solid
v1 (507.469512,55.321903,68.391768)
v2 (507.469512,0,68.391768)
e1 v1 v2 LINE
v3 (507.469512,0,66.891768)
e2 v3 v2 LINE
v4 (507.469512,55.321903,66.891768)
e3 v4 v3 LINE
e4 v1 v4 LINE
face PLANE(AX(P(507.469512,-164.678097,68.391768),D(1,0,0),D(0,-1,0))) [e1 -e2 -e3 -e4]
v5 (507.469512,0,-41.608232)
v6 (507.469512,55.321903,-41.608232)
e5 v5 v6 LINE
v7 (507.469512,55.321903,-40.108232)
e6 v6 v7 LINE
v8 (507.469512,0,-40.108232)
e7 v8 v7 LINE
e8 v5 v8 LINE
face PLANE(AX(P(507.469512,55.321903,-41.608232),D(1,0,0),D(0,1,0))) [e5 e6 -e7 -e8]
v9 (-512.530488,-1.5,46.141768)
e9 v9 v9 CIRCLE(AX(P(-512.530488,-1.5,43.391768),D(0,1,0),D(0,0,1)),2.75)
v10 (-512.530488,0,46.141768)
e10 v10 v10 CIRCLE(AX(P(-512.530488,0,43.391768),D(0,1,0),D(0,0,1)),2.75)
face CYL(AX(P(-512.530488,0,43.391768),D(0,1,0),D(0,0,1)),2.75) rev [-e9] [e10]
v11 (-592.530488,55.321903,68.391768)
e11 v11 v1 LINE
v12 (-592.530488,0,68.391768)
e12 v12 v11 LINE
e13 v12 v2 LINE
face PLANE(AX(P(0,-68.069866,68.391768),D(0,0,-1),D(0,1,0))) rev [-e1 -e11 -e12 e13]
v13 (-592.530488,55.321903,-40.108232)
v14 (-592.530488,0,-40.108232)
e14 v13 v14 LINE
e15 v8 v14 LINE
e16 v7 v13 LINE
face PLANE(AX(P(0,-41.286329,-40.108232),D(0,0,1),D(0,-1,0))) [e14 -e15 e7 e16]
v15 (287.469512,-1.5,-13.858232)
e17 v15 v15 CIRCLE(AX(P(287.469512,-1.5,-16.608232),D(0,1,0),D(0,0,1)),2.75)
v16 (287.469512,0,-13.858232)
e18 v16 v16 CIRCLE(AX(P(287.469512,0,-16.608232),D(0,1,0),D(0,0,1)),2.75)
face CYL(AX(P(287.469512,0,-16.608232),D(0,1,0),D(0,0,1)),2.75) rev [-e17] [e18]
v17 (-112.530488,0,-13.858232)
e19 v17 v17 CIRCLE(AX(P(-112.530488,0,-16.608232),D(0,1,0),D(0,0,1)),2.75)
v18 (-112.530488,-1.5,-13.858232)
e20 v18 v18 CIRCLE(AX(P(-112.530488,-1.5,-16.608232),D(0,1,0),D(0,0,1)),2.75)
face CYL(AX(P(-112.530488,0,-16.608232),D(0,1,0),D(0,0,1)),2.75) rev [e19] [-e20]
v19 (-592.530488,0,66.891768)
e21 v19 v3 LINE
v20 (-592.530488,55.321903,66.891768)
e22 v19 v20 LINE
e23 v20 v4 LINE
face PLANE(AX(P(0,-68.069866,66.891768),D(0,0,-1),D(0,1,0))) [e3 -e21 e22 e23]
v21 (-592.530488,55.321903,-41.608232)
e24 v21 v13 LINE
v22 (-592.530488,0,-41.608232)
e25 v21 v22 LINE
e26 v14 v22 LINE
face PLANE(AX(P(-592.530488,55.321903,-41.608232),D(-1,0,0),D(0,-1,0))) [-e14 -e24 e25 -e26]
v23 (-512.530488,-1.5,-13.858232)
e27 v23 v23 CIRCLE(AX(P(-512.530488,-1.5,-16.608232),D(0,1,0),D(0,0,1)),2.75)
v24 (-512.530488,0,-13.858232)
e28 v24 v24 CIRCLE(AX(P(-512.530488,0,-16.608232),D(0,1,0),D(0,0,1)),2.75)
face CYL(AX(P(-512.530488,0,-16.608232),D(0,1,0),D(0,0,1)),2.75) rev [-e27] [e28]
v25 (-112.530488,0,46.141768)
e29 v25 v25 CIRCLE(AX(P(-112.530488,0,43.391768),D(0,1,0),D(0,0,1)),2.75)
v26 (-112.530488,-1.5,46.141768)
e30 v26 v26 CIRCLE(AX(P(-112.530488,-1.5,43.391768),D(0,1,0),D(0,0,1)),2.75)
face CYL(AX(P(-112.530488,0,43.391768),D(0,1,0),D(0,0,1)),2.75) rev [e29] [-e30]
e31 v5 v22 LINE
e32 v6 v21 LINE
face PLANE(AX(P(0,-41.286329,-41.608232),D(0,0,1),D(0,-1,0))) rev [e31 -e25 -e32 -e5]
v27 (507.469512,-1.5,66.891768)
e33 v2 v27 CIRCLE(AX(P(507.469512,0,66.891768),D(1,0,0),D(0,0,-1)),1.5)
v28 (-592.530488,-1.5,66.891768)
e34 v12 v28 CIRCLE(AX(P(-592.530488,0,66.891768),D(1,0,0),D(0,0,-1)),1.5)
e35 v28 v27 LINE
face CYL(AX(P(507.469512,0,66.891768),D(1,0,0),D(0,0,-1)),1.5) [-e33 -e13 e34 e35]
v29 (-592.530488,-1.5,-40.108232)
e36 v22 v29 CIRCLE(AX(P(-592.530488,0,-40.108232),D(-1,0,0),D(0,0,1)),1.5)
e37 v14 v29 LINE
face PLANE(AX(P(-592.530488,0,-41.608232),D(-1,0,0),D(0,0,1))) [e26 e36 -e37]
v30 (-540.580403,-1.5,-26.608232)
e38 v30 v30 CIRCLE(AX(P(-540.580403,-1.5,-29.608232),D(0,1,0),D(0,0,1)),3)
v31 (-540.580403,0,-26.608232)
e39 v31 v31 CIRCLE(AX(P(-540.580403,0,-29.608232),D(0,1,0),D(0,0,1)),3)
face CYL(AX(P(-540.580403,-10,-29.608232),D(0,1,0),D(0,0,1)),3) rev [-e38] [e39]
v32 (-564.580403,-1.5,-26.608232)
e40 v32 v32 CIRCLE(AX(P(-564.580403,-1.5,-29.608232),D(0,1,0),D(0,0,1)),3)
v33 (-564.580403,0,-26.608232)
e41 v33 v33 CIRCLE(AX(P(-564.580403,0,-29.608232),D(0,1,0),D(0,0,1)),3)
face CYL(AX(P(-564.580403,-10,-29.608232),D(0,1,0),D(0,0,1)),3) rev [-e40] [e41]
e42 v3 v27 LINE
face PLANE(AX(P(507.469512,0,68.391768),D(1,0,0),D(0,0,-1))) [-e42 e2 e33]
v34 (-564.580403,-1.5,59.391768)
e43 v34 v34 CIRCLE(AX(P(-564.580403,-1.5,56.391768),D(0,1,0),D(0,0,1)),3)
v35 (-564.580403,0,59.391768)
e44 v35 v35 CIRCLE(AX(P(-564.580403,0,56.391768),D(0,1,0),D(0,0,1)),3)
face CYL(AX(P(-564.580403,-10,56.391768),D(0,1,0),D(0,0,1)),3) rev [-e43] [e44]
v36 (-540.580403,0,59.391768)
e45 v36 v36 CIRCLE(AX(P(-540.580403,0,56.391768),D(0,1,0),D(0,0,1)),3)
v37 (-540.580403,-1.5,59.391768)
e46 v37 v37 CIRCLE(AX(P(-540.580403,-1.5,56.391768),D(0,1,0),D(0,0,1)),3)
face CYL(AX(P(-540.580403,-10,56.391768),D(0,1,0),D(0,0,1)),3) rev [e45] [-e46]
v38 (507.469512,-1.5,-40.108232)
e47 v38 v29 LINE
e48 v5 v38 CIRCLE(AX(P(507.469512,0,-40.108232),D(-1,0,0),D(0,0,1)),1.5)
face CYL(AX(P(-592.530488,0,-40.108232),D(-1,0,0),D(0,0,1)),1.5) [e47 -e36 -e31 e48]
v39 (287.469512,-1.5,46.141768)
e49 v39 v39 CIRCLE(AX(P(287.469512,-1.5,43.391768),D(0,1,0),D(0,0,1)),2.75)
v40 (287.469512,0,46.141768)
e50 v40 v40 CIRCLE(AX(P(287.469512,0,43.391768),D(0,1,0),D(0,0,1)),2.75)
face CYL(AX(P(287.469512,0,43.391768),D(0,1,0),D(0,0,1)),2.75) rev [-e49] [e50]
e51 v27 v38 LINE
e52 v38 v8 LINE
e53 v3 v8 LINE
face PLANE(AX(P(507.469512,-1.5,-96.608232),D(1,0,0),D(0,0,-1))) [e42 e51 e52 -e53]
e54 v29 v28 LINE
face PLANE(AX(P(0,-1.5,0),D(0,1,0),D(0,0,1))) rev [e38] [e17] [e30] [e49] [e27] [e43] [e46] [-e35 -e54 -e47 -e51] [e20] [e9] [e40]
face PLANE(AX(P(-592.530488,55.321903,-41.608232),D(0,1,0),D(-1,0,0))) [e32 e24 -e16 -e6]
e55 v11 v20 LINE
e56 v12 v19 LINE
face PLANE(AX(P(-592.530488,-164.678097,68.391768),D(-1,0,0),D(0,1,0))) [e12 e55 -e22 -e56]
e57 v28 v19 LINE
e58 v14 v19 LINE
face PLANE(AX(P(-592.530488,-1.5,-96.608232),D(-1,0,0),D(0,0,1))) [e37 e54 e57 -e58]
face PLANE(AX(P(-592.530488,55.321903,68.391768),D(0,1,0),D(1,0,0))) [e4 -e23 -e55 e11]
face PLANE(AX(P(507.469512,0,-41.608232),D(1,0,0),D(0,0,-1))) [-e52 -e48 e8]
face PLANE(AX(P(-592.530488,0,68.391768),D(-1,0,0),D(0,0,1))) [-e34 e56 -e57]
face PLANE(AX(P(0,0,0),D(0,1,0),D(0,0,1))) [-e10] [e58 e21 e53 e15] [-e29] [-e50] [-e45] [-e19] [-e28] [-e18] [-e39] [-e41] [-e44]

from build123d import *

# Parameters (mm, degrees)
CROQUIS1_W                      = 1100
CROQUIS1_H                      = 220
BRIDA_BASE1_DEPTH               = 1.5
PLIEGUE_START                   = -592.530487805
PLIEGUE_CROQUIZADO1_DEPTH       = 1100
PLIEGUE_CROQUIZADO1_2_OUTLINE_W = 55.321902755
PLIEGUE_CROQUIZADO1_2_OUTLINE_H = 1.5
PLIEGUE_CROQUIZADO1_2_DEPTH     = 1100
CROQUIS8_R                      = 3
CORTAR_EXTRUIR1_DEPTH           = 10
TALADRO_DE_MARGEN_PARA_M51_D    = 5.5


# Read off the part's stored shape, not the designer's step: Pliegue croquizado1
# Sheet-metal steps are written as plain solids
with BuildPart() as part:
    # Croquis1 → Brida base1 (new body)
    with BuildSketch(Plane(origin=(0, 0, 0), x_dir=(1, 0, 0), z_dir=(0, 1, 0))):
        with Locations((-42.530487805, -13.391768293)):
            Rectangle(CROQUIS1_W, CROQUIS1_H)
    extrude(amount=-BRIDA_BASE1_DEPTH)

    # Pliegue croquizado1 outline → Pliegue croquizado1 (cut)
    with BuildSketch(Plane.YZ.offset(PLIEGUE_START)):
        with BuildLine():
            Line((0, -96.608231707), (0, -41.608231707))
            ThreePointArc((0, -41.608231707), (-1.060660172, -41.168891879), (-1.5, -40.108231707))
            Line((-1.5, -40.108231707), (-1.5, -96.608231707))
            Line((-1.5, -96.608231707), (0, -96.608231707))
        make_face()
        with BuildLine():
            Line((-1.5, 123.391768293), (-1.5, 66.891768293))
            ThreePointArc((-1.5, 66.891768293), (-1.060660171, 67.952428465), (0, 68.391768293))
            Line((0, 68.391768293), (0, 123.391768293))
            Line((0, 123.391768293), (-1.5, 123.391768293))
        make_face()
    extrude(amount=PLIEGUE_CROQUIZADO1_DEPTH, mode=Mode.SUBTRACT)

    # Pliegue croquizado1 2 outline → Pliegue croquizado1 2 (add)
    with BuildSketch(Plane.YZ.offset(PLIEGUE_START)):
        with Locations((27.660951378, -40.858231707)):
            Rectangle(PLIEGUE_CROQUIZADO1_2_OUTLINE_W, PLIEGUE_CROQUIZADO1_2_OUTLINE_H)
        with Locations((27.660951378, 67.641768293)):
            Rectangle(PLIEGUE_CROQUIZADO1_2_OUTLINE_W, PLIEGUE_CROQUIZADO1_2_OUTLINE_H)
    extrude(amount=PLIEGUE_CROQUIZADO1_2_DEPTH)

    # Croquis8 → Cortar-Extruir1 (cut)
    with BuildSketch(Plane(origin=(0, 0, 0), x_dir=(1, 0, 0), z_dir=(0, 1, 0))):
        with Locations(Location((-564.580402517, -56.391768293, 0), (0, 0, 270))):
            Circle(CROQUIS8_R)
        with Locations(Location((-540.580402517, -56.391768293, 0), (0, 0, 270))):
            Circle(CROQUIS8_R)
        with Locations(Location((-540.580402517, 29.608231707, 0), (0, 0, 270))):
            Circle(CROQUIS8_R)
        with Locations(Location((-564.580402517, 29.608231707, 0), (0, 0, 270))):
            Circle(CROQUIS8_R)
    extrude(amount=-CORTAR_EXTRUIR1_DEPTH, mode=Mode.SUBTRACT)

    # Taladro de margen para M51 (through all)
    with Locations(Plane(origin=(0, 0, 0), x_dir=(1, 0, 0), z_dir=(0, 1, 0))):
        with Locations((-512.530487805, -43.391768293), (-512.530487805, 16.608231707), (-112.530487805, -43.391768293), (-112.530487805, 16.608231707), (287.469512195, -43.391768293), (287.469512195, 16.608231707)):
            Hole(TALADRO_DE_MARGEN_PARA_M51_D / 2)


solid = part.part
